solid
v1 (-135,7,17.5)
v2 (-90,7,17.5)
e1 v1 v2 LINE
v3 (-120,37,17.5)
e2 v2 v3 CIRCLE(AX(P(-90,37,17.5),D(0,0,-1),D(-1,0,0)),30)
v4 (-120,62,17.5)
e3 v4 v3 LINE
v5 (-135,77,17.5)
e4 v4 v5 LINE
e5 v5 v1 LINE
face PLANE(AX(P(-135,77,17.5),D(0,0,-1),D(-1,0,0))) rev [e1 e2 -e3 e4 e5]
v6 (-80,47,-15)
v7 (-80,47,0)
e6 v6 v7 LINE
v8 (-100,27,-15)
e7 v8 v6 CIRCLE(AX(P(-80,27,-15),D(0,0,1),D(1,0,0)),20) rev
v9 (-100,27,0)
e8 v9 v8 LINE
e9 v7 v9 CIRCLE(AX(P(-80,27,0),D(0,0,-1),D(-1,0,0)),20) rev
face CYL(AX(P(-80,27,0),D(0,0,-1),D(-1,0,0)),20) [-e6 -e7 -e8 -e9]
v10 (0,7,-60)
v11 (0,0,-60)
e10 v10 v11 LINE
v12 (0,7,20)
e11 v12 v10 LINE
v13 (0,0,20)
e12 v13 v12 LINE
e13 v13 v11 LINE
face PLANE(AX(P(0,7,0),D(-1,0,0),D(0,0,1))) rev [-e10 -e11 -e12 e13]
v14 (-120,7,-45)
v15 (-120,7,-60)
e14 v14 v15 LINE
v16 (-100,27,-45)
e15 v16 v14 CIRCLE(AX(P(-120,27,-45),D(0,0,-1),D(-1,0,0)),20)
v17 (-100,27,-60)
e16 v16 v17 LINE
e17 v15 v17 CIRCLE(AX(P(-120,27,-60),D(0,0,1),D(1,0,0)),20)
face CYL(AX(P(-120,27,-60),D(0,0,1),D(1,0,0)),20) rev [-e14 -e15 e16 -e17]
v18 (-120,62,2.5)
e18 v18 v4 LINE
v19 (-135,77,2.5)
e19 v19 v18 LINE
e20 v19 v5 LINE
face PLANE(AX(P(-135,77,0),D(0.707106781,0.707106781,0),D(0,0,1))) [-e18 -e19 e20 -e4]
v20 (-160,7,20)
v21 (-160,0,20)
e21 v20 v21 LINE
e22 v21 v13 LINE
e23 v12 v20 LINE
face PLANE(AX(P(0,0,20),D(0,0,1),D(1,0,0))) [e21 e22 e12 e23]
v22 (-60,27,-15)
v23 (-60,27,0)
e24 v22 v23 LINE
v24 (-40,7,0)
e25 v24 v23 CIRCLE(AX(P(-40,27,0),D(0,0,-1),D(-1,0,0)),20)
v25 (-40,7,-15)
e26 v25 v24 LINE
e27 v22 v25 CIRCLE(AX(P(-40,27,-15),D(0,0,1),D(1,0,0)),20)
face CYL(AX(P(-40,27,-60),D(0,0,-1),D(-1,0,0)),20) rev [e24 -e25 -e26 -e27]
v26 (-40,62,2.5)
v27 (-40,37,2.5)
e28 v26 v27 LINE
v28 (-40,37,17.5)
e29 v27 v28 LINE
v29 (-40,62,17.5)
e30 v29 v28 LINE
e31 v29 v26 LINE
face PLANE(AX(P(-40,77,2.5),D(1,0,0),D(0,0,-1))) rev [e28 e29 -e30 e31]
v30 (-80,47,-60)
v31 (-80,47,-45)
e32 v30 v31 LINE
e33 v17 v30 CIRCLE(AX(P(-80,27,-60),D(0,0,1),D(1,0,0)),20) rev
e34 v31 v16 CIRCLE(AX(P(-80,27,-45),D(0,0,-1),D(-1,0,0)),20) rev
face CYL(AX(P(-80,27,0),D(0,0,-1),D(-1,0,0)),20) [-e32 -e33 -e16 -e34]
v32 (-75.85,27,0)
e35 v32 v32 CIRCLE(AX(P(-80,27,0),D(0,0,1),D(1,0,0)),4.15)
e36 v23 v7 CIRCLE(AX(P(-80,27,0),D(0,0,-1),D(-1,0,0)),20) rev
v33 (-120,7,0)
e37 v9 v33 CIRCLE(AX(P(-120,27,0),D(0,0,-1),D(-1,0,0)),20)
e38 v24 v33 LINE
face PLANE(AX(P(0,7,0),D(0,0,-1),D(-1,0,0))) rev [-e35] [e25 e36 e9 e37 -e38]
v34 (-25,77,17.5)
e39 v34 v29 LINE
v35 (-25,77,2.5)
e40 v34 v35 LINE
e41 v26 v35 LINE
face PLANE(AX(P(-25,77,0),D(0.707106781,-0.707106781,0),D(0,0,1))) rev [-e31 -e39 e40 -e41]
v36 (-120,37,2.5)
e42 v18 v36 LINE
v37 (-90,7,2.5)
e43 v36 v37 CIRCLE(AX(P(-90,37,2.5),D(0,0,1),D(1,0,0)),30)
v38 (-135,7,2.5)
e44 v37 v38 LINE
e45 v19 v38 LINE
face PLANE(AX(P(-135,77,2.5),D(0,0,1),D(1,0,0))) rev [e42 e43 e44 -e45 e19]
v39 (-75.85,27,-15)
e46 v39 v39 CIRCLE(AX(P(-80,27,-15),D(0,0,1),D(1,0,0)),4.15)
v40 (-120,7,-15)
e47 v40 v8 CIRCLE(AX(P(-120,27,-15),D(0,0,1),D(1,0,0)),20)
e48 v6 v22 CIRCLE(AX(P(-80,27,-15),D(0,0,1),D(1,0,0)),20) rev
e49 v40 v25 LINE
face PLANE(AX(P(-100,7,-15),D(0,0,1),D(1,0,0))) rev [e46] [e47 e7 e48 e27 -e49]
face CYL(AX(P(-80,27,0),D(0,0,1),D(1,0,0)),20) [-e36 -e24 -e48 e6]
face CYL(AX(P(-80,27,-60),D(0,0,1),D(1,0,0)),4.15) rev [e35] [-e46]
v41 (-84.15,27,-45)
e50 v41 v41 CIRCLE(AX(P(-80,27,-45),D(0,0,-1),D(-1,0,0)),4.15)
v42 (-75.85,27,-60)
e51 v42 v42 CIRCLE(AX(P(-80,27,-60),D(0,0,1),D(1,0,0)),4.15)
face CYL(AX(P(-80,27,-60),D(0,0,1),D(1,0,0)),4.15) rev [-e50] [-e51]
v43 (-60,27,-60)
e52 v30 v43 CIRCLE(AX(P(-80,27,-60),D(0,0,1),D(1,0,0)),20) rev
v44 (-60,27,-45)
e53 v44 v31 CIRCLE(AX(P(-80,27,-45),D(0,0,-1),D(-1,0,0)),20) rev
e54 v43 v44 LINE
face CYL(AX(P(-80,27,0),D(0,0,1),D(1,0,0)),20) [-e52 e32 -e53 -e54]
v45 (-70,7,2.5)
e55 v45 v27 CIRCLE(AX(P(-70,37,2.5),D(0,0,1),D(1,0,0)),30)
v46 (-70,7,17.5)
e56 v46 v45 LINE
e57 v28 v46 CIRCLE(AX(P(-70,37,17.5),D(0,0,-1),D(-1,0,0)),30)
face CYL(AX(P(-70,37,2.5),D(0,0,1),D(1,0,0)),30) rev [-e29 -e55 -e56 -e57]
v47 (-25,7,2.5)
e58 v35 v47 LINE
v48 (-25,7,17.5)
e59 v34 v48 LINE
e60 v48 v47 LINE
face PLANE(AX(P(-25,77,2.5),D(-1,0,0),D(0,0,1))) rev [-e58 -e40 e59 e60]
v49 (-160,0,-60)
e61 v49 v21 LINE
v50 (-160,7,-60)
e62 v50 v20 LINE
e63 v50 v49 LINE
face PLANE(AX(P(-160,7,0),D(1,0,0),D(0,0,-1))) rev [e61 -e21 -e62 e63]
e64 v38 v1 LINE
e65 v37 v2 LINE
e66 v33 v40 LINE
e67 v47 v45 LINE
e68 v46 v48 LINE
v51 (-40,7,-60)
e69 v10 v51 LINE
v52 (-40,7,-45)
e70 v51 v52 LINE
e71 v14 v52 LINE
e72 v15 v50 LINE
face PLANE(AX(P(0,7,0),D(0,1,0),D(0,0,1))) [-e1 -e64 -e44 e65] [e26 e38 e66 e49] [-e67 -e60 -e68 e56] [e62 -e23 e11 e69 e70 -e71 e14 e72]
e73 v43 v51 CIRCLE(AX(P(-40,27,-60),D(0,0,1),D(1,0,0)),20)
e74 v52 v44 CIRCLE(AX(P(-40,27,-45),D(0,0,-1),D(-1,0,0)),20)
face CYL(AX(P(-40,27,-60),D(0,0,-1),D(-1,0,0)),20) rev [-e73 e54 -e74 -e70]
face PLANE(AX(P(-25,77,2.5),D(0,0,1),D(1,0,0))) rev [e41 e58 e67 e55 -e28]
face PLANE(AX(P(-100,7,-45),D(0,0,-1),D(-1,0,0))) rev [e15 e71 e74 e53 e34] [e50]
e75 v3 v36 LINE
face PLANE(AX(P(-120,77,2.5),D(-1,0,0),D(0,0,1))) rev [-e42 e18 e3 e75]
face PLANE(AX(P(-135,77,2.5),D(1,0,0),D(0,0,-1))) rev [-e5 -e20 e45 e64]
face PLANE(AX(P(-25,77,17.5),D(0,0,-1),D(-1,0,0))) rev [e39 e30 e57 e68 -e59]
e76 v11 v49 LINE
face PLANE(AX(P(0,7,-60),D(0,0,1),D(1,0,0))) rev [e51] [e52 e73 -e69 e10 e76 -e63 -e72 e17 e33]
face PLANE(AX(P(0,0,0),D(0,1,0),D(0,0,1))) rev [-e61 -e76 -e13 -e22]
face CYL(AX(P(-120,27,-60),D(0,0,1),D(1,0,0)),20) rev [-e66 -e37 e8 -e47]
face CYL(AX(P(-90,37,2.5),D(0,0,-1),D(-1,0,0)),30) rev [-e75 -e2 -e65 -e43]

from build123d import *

# Parameters (mm, degrees)
SKETCH1_W           = 160
SKETCH1_H           = 60
BOSS_EXTRUDE1_DEPTH = 7
SKETCH2_W           = 40
SKETCH2_H           = 60
BOSS_EXTRUDE2_DEPTH = 40
FILLET1_R           = 20
SKETCH3_W           = 30
SKETCH3_H           = 40
CUT_EXTRUDE1_DEPTH  = 40
SKETCH4_R           = 4.15
CUT_EXTRUDE2_DEPTH  = 178.225844616
FILLET2_R           = 20
SKETCH5_W           = 160
SKETCH5_H           = 7
BOSS_EXTRUDE3_DEPTH = 20
SKETCH6_W           = 15
SKETCH6_H           = 15
BOSS_EXTRUDE4_DEPTH = 70
FILLET3_R           = 30
CHAMFER1_SIZE       = 15


with BuildPart() as part:
    # Sketch1 → Boss-Extrude1 (new body)
    with BuildSketch(Plane(origin=(0, 0, 0), x_dir=(1, 0, 0), z_dir=(0, 1, 0))):
        with Locations((-80, 30)):
            Rectangle(SKETCH1_W, SKETCH1_H)
    extrude(amount=BOSS_EXTRUDE1_DEPTH)

    # Sketch2 → Boss-Extrude2 (add)
    with BuildSketch(Plane(origin=(0, 7, 0), x_dir=(1, 0, 0), z_dir=(0, 1, 0))):
        with Locations((-80, 30)):
            Rectangle(SKETCH2_W, SKETCH2_H)
    extrude(amount=BOSS_EXTRUDE2_DEPTH)

    # Fillet1
    fillet1_edges = [part.edges().sort_by_distance(p)[0] for p in [
        (-60, 47, -30),
        (-100, 47, -30),
    ]]
    fillet(fillet1_edges, radius=FILLET1_R - 0.0001)  # a hair under: the kernel refuses the full size

    # Sketch3 → Cut-Extrude1 (cut)
    with BuildSketch(Plane(origin=(-60, 0, 0), x_dir=(0, 0, -1), z_dir=(1, 0, 0))):
        with Locations((30, 27)):
            Rectangle(SKETCH3_W, SKETCH3_H)
    extrude(amount=-CUT_EXTRUDE1_DEPTH, mode=Mode.SUBTRACT)

    # Sketch4 → Cut-Extrude2 (cut, through all)
    with BuildSketch(Plane.XY):
        with Locations((-80, 27)):
            Circle(SKETCH4_R)
    extrude(amount=-CUT_EXTRUDE2_DEPTH, mode=Mode.SUBTRACT)

    # Fillet2
    fillet2_edges = [part.edges().sort_by_distance(p)[0] for p in [
        (-100, 7, -7.5),
        (-100, 7, -52.5),
        (-60, 7, -7.5),
        (-60, 7, -52.5),
    ]]
    fillet(fillet2_edges, radius=FILLET2_R)

    # Sketch5 → Boss-Extrude3 (add)
    with BuildSketch(Plane.XY):
        with Locations((-80, 3.5)):
            Rectangle(SKETCH5_W, SKETCH5_H)
    extrude(amount=BOSS_EXTRUDE3_DEPTH)

    # Sketch6 → Boss-Extrude4 (add)
    with BuildSketch(Plane(origin=(0, 7, 0), x_dir=(1, 0, 0), z_dir=(0, 1, 0))):
        with Locations((-127.5, -10)):
            Rectangle(SKETCH6_W, SKETCH6_H)
        with Locations((-32.5, -10)):
            Rectangle(SKETCH6_W, SKETCH6_H)
    extrude(amount=BOSS_EXTRUDE4_DEPTH)

    # Fillet3
    fillet3_edges = [part.edges().sort_by_distance(p)[0] for p in [
        (-120, 7, 10),
        (-40, 7, 10),
    ]]
    fillet(fillet3_edges, radius=FILLET3_R)

    # Chamfer1
    chamfer1_edges = [part.edges().sort_by_distance(p)[0] for p in [
        (-40, 77, 10),
        (-120, 77, 10),
    ]]
    chamfer(chamfer1_edges, length=CHAMFER1_SIZE - 0.0001)  # a hair under: the kernel refuses the full size


solid = part.part
